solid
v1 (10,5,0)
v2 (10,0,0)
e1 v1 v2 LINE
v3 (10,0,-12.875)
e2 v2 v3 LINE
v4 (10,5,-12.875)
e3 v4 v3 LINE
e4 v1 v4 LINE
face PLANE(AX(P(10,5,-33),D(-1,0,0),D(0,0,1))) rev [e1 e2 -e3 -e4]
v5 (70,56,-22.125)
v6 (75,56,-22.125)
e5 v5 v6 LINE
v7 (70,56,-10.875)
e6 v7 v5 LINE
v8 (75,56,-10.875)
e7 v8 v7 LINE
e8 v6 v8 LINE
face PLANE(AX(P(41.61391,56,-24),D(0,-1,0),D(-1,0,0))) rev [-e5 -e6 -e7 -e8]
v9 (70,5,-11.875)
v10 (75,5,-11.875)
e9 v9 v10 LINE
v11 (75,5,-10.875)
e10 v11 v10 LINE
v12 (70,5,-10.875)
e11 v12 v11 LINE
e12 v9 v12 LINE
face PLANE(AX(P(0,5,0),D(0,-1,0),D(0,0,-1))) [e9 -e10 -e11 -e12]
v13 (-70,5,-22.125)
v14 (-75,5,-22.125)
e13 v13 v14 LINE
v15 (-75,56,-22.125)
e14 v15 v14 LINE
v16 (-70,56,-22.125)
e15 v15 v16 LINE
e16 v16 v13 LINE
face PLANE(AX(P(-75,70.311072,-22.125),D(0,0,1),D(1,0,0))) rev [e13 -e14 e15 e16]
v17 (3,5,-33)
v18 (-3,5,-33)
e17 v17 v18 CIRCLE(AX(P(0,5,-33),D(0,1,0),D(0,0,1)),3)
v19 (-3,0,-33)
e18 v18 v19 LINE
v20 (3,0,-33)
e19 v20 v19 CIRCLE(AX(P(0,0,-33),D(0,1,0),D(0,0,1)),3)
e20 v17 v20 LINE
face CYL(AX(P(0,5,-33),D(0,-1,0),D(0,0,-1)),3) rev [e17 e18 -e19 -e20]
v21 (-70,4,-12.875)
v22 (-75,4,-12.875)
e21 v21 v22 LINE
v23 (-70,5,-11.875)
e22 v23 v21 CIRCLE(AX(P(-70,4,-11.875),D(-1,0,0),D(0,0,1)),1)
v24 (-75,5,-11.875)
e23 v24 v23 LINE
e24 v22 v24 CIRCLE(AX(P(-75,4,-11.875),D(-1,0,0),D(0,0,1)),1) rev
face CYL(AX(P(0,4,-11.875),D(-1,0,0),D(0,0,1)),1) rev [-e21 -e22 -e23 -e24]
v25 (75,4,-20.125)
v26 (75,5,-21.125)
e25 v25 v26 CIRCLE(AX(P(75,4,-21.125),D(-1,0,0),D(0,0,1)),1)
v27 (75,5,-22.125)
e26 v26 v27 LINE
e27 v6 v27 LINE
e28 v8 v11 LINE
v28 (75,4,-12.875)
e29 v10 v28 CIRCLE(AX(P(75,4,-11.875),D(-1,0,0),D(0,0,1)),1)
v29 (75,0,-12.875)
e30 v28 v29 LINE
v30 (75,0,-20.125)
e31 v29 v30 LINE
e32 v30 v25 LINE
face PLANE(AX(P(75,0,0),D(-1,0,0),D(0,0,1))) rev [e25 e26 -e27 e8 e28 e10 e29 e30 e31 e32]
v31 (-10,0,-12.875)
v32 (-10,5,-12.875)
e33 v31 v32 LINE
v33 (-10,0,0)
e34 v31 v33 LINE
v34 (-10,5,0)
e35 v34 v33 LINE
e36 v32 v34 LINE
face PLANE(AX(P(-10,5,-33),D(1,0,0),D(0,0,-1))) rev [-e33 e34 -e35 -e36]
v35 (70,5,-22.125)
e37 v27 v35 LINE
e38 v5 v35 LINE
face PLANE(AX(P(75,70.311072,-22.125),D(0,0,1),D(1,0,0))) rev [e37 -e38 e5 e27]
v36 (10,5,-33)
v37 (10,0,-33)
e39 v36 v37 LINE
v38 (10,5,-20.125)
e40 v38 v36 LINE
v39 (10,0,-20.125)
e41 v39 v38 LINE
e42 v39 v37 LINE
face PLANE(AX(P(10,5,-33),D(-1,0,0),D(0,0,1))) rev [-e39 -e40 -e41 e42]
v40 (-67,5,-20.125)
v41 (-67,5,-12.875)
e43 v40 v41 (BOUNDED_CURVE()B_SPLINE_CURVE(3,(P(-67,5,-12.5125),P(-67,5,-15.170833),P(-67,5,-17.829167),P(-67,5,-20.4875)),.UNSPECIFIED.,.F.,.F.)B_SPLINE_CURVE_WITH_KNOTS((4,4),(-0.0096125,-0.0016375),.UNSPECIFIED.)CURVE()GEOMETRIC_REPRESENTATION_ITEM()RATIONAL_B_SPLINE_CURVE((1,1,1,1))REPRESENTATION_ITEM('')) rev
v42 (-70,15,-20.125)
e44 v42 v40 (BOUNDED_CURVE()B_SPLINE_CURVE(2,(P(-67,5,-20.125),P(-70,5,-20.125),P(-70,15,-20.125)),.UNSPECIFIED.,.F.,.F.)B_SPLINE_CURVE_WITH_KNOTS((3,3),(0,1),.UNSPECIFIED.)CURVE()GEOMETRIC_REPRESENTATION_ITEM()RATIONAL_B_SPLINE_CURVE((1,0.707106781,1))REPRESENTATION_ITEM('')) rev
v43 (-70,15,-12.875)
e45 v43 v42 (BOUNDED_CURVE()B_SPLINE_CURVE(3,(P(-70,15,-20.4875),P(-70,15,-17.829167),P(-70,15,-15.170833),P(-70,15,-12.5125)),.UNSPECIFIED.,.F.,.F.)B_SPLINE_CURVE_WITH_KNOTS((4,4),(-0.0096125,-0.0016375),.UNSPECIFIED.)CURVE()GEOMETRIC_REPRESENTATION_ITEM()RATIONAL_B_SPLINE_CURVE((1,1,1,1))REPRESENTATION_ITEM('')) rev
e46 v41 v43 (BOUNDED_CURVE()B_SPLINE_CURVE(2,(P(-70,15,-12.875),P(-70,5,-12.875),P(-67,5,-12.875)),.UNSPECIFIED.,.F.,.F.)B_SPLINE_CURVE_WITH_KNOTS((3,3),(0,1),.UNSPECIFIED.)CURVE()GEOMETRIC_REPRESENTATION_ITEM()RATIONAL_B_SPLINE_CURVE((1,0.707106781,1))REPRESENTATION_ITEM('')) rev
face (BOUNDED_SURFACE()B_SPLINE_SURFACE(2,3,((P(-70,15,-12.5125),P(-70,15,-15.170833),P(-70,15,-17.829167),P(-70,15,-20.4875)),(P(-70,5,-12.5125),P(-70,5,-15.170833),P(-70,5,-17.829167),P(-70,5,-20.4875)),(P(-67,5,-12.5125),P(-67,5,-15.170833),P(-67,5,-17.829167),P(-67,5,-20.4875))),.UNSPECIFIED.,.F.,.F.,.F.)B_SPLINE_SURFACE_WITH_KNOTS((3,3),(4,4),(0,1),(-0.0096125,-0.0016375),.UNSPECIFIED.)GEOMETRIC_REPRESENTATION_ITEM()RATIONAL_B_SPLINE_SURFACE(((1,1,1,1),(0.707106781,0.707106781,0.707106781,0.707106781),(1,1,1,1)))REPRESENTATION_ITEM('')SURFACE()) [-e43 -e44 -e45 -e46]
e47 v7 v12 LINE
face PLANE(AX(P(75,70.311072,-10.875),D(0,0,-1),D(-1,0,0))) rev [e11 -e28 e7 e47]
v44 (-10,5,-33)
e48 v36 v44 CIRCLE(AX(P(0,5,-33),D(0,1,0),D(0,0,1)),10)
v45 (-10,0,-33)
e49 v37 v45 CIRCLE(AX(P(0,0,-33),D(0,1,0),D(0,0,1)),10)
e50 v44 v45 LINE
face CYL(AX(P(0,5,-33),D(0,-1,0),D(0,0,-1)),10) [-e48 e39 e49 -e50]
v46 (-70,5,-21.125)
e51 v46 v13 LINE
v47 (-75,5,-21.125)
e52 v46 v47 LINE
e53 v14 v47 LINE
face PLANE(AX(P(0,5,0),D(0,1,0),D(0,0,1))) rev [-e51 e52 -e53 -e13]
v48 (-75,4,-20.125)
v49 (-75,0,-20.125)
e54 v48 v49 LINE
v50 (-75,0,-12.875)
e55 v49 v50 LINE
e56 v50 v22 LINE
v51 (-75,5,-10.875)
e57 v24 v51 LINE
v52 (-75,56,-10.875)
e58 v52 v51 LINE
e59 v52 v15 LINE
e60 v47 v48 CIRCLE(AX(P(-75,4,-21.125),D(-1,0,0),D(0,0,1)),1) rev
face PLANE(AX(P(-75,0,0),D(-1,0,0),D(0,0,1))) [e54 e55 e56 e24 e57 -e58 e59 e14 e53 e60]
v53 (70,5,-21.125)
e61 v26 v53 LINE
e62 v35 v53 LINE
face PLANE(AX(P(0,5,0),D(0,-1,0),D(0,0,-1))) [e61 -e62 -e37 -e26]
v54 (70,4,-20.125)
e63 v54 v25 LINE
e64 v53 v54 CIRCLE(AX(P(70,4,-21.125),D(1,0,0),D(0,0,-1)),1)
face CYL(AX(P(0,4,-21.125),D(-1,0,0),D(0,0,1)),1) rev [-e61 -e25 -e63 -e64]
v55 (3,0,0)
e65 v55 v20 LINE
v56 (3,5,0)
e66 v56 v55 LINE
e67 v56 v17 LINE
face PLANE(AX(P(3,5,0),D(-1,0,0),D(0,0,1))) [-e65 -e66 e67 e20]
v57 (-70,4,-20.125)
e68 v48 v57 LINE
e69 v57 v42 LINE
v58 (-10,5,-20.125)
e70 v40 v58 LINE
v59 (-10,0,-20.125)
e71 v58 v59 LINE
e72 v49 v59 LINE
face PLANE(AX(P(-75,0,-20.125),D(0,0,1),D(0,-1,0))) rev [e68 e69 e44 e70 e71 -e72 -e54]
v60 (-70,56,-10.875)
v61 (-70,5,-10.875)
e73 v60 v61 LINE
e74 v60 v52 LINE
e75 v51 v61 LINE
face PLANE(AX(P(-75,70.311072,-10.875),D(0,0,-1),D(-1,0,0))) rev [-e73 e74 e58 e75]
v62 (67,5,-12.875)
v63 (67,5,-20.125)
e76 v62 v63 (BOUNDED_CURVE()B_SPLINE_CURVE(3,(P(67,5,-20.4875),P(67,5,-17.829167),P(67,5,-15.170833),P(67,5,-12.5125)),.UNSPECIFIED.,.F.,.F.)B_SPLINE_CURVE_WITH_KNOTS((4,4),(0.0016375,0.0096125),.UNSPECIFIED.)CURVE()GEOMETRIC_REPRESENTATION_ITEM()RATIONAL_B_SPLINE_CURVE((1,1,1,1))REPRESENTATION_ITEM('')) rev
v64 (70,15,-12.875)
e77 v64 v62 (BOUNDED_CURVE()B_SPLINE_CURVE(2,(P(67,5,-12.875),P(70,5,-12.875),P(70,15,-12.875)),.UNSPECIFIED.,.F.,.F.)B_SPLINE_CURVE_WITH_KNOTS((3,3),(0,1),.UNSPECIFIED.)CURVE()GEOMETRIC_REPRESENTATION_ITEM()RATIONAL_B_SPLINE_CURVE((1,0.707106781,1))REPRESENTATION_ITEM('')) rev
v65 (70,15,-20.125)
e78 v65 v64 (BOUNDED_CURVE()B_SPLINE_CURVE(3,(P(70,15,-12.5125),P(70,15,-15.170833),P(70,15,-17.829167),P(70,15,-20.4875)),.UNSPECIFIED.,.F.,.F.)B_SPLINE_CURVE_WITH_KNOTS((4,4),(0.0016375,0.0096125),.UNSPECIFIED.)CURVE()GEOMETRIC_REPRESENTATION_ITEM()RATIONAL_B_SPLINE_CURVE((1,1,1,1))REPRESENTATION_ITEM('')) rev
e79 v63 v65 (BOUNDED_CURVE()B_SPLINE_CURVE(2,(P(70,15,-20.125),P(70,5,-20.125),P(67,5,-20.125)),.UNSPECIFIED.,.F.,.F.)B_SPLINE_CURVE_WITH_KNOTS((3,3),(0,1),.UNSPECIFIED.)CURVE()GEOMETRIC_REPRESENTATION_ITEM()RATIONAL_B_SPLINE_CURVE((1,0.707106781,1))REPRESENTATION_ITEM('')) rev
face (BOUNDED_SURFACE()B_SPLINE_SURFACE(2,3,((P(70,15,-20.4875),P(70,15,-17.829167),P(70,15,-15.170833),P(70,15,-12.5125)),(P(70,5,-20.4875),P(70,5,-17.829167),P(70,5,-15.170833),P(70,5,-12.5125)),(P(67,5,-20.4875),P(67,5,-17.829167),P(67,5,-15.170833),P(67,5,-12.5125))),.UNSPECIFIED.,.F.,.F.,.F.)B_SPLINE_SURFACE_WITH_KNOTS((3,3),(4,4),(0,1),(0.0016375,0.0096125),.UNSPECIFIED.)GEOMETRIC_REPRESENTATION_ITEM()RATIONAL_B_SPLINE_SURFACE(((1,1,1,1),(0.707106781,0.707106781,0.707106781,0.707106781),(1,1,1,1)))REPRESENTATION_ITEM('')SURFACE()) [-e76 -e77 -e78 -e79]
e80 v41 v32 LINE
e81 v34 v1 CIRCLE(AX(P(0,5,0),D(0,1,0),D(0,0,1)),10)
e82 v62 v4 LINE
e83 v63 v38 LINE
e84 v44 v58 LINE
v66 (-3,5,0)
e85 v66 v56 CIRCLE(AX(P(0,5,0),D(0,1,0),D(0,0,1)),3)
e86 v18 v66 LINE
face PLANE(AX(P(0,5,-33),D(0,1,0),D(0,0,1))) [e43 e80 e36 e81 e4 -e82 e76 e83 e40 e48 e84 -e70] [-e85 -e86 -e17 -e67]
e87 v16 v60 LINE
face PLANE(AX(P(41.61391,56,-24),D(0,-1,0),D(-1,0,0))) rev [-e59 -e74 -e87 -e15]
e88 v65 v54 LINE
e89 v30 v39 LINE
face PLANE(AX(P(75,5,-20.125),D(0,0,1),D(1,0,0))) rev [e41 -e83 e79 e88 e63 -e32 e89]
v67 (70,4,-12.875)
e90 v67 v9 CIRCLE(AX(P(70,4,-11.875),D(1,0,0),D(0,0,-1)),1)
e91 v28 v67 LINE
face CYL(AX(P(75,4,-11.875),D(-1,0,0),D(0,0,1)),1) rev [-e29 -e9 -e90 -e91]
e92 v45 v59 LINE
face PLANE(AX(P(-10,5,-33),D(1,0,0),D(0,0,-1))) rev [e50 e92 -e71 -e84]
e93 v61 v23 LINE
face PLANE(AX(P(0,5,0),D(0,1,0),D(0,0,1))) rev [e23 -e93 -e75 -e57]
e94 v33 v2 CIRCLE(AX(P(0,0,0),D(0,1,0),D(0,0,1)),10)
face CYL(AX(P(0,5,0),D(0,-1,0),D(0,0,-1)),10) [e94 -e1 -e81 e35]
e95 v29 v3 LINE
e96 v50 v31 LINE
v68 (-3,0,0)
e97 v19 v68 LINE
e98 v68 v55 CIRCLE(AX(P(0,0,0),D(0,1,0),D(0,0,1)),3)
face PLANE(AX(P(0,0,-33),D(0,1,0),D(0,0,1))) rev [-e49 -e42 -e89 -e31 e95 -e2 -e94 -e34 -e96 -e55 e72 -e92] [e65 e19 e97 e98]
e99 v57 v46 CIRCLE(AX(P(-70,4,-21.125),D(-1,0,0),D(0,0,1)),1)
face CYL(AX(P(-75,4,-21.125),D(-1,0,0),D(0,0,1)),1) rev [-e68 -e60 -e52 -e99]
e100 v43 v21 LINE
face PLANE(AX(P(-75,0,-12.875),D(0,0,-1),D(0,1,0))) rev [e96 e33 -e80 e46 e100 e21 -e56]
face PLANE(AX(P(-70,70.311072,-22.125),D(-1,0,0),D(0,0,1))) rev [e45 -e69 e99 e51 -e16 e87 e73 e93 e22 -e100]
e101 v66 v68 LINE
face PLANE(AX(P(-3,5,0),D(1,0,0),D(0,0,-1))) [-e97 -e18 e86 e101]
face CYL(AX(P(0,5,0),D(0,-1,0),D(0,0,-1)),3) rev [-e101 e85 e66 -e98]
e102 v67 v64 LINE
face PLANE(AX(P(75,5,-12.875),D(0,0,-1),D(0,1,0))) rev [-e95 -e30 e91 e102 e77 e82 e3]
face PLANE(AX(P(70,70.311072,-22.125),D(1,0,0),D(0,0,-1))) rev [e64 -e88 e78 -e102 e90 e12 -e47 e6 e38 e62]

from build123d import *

# Parameters (mm, degrees)
BOSS_EXTRUDE1_DEPTH = 5
SKETCH2_W           = 7.25
SKETCH2_H           = 5
BOSS_EXTRUDE2_DEPTH = 65
SKETCH3_W           = 7.25
SKETCH3_H           = 5
BOSS_EXTRUDE3_DEPTH = 65
SKETCH4_W           = 5
SKETCH4_H           = 11.25
BOSS_EXTRUDE4_DEPTH = 51
FILLET2_R           = 1
FILLET3_SIZE        = 3
FILLET3_SIZE_2      = 10


with BuildPart() as part:
    # Sketch1 → Boss-Extrude1 (new body)
    with BuildSketch(Plane(origin=(0, 0, 0), x_dir=(1, 0, 0), z_dir=(0, 1, 0))):
        with BuildLine():
            Line((10, 33), (10, 0))
            ThreePointArc((10, 0), (0, -10), (-10, 0))
            Line((-10, 0), (-10, 33))
            ThreePointArc((-10, 33), (0, 43), (10, 33))
        make_face()
        with BuildLine():
            Line((-3, 0), (-3, 33))
            ThreePointArc((-3, 33), (0, 36), (3, 33))
            Line((3, 33), (3, 0))
            ThreePointArc((3, 0), (0, -3), (-3, 0))
        make_face(mode=Mode.SUBTRACT)
    extrude(amount=BOSS_EXTRUDE1_DEPTH)

    # Sketch2 → Boss-Extrude2 (add)
    with BuildSketch(Plane(origin=(10, 0, 0), x_dir=(0, 0, -1), z_dir=(1, 0, 0))):
        with Locations((16.5, 2.5)):
            Rectangle(SKETCH2_W, SKETCH2_H)
    extrude(amount=BOSS_EXTRUDE2_DEPTH)

    # Sketch3 → Boss-Extrude3 (add)
    with BuildSketch(Plane.ZY.offset(10)):
        with Locations((-16.5, 2.5)):
            Rectangle(SKETCH3_W, SKETCH3_H)
    extrude(amount=BOSS_EXTRUDE3_DEPTH)

    # Sketch4 → Boss-Extrude4 (add)
    with BuildSketch(Plane(origin=(0, 5, 0), x_dir=(1, 0, 0), z_dir=(0, 1, 0))):
        with Locations((72.5, 16.5)):
            Rectangle(SKETCH4_W, SKETCH4_H)
        with Locations((-72.5, 16.5)):
            Rectangle(SKETCH4_W, SKETCH4_H)
    extrude(amount=BOSS_EXTRUDE4_DEPTH)

    # Fillet2
    fillet2_edges = [part.edges().sort_by_distance(p)[0] for p in [
        (72.5, 5, -20.125),
        (72.5, 5, -12.875),
        (-72.5, 5, -12.875),
        (-72.5, 5, -20.125),
    ]]
    fillet(fillet2_edges, radius=FILLET2_R)

    # Fillet3
    # an asymmetric fillet: 10, 3 mm, written as the material it adds along each edge
    with BuildSketch(Plane(origin=(70, 5, -20.125), x_dir=(-1, 0, 0), z_dir=(0, 0, 1))) as fillet3_piece_1:
        with BuildLine():
            Bezier((FILLET3_SIZE, 0), (0, 0), (0, -FILLET3_SIZE_2), weights=[1, 0.707106781, 1])
            Line((0, -FILLET3_SIZE_2), (0, 0))
            Line((0, 0), (FILLET3_SIZE, 0))
        make_face()
    extrude(amount=7.25)
    with BuildSketch(Plane(origin=(-70, 5, -20.125), x_dir=(0, 1, 0), z_dir=(0, 0, 1))) as fillet3_piece_2:
        with BuildLine():
            Bezier((FILLET3_SIZE_2, 0), (0, 0), (0, -FILLET3_SIZE), weights=[1, 0.707106781, 1])
            Line((0, -FILLET3_SIZE), (0, 0))
            Line((0, 0), (FILLET3_SIZE_2, 0))
        make_face()
    extrude(amount=7.25)


solid = part.part
